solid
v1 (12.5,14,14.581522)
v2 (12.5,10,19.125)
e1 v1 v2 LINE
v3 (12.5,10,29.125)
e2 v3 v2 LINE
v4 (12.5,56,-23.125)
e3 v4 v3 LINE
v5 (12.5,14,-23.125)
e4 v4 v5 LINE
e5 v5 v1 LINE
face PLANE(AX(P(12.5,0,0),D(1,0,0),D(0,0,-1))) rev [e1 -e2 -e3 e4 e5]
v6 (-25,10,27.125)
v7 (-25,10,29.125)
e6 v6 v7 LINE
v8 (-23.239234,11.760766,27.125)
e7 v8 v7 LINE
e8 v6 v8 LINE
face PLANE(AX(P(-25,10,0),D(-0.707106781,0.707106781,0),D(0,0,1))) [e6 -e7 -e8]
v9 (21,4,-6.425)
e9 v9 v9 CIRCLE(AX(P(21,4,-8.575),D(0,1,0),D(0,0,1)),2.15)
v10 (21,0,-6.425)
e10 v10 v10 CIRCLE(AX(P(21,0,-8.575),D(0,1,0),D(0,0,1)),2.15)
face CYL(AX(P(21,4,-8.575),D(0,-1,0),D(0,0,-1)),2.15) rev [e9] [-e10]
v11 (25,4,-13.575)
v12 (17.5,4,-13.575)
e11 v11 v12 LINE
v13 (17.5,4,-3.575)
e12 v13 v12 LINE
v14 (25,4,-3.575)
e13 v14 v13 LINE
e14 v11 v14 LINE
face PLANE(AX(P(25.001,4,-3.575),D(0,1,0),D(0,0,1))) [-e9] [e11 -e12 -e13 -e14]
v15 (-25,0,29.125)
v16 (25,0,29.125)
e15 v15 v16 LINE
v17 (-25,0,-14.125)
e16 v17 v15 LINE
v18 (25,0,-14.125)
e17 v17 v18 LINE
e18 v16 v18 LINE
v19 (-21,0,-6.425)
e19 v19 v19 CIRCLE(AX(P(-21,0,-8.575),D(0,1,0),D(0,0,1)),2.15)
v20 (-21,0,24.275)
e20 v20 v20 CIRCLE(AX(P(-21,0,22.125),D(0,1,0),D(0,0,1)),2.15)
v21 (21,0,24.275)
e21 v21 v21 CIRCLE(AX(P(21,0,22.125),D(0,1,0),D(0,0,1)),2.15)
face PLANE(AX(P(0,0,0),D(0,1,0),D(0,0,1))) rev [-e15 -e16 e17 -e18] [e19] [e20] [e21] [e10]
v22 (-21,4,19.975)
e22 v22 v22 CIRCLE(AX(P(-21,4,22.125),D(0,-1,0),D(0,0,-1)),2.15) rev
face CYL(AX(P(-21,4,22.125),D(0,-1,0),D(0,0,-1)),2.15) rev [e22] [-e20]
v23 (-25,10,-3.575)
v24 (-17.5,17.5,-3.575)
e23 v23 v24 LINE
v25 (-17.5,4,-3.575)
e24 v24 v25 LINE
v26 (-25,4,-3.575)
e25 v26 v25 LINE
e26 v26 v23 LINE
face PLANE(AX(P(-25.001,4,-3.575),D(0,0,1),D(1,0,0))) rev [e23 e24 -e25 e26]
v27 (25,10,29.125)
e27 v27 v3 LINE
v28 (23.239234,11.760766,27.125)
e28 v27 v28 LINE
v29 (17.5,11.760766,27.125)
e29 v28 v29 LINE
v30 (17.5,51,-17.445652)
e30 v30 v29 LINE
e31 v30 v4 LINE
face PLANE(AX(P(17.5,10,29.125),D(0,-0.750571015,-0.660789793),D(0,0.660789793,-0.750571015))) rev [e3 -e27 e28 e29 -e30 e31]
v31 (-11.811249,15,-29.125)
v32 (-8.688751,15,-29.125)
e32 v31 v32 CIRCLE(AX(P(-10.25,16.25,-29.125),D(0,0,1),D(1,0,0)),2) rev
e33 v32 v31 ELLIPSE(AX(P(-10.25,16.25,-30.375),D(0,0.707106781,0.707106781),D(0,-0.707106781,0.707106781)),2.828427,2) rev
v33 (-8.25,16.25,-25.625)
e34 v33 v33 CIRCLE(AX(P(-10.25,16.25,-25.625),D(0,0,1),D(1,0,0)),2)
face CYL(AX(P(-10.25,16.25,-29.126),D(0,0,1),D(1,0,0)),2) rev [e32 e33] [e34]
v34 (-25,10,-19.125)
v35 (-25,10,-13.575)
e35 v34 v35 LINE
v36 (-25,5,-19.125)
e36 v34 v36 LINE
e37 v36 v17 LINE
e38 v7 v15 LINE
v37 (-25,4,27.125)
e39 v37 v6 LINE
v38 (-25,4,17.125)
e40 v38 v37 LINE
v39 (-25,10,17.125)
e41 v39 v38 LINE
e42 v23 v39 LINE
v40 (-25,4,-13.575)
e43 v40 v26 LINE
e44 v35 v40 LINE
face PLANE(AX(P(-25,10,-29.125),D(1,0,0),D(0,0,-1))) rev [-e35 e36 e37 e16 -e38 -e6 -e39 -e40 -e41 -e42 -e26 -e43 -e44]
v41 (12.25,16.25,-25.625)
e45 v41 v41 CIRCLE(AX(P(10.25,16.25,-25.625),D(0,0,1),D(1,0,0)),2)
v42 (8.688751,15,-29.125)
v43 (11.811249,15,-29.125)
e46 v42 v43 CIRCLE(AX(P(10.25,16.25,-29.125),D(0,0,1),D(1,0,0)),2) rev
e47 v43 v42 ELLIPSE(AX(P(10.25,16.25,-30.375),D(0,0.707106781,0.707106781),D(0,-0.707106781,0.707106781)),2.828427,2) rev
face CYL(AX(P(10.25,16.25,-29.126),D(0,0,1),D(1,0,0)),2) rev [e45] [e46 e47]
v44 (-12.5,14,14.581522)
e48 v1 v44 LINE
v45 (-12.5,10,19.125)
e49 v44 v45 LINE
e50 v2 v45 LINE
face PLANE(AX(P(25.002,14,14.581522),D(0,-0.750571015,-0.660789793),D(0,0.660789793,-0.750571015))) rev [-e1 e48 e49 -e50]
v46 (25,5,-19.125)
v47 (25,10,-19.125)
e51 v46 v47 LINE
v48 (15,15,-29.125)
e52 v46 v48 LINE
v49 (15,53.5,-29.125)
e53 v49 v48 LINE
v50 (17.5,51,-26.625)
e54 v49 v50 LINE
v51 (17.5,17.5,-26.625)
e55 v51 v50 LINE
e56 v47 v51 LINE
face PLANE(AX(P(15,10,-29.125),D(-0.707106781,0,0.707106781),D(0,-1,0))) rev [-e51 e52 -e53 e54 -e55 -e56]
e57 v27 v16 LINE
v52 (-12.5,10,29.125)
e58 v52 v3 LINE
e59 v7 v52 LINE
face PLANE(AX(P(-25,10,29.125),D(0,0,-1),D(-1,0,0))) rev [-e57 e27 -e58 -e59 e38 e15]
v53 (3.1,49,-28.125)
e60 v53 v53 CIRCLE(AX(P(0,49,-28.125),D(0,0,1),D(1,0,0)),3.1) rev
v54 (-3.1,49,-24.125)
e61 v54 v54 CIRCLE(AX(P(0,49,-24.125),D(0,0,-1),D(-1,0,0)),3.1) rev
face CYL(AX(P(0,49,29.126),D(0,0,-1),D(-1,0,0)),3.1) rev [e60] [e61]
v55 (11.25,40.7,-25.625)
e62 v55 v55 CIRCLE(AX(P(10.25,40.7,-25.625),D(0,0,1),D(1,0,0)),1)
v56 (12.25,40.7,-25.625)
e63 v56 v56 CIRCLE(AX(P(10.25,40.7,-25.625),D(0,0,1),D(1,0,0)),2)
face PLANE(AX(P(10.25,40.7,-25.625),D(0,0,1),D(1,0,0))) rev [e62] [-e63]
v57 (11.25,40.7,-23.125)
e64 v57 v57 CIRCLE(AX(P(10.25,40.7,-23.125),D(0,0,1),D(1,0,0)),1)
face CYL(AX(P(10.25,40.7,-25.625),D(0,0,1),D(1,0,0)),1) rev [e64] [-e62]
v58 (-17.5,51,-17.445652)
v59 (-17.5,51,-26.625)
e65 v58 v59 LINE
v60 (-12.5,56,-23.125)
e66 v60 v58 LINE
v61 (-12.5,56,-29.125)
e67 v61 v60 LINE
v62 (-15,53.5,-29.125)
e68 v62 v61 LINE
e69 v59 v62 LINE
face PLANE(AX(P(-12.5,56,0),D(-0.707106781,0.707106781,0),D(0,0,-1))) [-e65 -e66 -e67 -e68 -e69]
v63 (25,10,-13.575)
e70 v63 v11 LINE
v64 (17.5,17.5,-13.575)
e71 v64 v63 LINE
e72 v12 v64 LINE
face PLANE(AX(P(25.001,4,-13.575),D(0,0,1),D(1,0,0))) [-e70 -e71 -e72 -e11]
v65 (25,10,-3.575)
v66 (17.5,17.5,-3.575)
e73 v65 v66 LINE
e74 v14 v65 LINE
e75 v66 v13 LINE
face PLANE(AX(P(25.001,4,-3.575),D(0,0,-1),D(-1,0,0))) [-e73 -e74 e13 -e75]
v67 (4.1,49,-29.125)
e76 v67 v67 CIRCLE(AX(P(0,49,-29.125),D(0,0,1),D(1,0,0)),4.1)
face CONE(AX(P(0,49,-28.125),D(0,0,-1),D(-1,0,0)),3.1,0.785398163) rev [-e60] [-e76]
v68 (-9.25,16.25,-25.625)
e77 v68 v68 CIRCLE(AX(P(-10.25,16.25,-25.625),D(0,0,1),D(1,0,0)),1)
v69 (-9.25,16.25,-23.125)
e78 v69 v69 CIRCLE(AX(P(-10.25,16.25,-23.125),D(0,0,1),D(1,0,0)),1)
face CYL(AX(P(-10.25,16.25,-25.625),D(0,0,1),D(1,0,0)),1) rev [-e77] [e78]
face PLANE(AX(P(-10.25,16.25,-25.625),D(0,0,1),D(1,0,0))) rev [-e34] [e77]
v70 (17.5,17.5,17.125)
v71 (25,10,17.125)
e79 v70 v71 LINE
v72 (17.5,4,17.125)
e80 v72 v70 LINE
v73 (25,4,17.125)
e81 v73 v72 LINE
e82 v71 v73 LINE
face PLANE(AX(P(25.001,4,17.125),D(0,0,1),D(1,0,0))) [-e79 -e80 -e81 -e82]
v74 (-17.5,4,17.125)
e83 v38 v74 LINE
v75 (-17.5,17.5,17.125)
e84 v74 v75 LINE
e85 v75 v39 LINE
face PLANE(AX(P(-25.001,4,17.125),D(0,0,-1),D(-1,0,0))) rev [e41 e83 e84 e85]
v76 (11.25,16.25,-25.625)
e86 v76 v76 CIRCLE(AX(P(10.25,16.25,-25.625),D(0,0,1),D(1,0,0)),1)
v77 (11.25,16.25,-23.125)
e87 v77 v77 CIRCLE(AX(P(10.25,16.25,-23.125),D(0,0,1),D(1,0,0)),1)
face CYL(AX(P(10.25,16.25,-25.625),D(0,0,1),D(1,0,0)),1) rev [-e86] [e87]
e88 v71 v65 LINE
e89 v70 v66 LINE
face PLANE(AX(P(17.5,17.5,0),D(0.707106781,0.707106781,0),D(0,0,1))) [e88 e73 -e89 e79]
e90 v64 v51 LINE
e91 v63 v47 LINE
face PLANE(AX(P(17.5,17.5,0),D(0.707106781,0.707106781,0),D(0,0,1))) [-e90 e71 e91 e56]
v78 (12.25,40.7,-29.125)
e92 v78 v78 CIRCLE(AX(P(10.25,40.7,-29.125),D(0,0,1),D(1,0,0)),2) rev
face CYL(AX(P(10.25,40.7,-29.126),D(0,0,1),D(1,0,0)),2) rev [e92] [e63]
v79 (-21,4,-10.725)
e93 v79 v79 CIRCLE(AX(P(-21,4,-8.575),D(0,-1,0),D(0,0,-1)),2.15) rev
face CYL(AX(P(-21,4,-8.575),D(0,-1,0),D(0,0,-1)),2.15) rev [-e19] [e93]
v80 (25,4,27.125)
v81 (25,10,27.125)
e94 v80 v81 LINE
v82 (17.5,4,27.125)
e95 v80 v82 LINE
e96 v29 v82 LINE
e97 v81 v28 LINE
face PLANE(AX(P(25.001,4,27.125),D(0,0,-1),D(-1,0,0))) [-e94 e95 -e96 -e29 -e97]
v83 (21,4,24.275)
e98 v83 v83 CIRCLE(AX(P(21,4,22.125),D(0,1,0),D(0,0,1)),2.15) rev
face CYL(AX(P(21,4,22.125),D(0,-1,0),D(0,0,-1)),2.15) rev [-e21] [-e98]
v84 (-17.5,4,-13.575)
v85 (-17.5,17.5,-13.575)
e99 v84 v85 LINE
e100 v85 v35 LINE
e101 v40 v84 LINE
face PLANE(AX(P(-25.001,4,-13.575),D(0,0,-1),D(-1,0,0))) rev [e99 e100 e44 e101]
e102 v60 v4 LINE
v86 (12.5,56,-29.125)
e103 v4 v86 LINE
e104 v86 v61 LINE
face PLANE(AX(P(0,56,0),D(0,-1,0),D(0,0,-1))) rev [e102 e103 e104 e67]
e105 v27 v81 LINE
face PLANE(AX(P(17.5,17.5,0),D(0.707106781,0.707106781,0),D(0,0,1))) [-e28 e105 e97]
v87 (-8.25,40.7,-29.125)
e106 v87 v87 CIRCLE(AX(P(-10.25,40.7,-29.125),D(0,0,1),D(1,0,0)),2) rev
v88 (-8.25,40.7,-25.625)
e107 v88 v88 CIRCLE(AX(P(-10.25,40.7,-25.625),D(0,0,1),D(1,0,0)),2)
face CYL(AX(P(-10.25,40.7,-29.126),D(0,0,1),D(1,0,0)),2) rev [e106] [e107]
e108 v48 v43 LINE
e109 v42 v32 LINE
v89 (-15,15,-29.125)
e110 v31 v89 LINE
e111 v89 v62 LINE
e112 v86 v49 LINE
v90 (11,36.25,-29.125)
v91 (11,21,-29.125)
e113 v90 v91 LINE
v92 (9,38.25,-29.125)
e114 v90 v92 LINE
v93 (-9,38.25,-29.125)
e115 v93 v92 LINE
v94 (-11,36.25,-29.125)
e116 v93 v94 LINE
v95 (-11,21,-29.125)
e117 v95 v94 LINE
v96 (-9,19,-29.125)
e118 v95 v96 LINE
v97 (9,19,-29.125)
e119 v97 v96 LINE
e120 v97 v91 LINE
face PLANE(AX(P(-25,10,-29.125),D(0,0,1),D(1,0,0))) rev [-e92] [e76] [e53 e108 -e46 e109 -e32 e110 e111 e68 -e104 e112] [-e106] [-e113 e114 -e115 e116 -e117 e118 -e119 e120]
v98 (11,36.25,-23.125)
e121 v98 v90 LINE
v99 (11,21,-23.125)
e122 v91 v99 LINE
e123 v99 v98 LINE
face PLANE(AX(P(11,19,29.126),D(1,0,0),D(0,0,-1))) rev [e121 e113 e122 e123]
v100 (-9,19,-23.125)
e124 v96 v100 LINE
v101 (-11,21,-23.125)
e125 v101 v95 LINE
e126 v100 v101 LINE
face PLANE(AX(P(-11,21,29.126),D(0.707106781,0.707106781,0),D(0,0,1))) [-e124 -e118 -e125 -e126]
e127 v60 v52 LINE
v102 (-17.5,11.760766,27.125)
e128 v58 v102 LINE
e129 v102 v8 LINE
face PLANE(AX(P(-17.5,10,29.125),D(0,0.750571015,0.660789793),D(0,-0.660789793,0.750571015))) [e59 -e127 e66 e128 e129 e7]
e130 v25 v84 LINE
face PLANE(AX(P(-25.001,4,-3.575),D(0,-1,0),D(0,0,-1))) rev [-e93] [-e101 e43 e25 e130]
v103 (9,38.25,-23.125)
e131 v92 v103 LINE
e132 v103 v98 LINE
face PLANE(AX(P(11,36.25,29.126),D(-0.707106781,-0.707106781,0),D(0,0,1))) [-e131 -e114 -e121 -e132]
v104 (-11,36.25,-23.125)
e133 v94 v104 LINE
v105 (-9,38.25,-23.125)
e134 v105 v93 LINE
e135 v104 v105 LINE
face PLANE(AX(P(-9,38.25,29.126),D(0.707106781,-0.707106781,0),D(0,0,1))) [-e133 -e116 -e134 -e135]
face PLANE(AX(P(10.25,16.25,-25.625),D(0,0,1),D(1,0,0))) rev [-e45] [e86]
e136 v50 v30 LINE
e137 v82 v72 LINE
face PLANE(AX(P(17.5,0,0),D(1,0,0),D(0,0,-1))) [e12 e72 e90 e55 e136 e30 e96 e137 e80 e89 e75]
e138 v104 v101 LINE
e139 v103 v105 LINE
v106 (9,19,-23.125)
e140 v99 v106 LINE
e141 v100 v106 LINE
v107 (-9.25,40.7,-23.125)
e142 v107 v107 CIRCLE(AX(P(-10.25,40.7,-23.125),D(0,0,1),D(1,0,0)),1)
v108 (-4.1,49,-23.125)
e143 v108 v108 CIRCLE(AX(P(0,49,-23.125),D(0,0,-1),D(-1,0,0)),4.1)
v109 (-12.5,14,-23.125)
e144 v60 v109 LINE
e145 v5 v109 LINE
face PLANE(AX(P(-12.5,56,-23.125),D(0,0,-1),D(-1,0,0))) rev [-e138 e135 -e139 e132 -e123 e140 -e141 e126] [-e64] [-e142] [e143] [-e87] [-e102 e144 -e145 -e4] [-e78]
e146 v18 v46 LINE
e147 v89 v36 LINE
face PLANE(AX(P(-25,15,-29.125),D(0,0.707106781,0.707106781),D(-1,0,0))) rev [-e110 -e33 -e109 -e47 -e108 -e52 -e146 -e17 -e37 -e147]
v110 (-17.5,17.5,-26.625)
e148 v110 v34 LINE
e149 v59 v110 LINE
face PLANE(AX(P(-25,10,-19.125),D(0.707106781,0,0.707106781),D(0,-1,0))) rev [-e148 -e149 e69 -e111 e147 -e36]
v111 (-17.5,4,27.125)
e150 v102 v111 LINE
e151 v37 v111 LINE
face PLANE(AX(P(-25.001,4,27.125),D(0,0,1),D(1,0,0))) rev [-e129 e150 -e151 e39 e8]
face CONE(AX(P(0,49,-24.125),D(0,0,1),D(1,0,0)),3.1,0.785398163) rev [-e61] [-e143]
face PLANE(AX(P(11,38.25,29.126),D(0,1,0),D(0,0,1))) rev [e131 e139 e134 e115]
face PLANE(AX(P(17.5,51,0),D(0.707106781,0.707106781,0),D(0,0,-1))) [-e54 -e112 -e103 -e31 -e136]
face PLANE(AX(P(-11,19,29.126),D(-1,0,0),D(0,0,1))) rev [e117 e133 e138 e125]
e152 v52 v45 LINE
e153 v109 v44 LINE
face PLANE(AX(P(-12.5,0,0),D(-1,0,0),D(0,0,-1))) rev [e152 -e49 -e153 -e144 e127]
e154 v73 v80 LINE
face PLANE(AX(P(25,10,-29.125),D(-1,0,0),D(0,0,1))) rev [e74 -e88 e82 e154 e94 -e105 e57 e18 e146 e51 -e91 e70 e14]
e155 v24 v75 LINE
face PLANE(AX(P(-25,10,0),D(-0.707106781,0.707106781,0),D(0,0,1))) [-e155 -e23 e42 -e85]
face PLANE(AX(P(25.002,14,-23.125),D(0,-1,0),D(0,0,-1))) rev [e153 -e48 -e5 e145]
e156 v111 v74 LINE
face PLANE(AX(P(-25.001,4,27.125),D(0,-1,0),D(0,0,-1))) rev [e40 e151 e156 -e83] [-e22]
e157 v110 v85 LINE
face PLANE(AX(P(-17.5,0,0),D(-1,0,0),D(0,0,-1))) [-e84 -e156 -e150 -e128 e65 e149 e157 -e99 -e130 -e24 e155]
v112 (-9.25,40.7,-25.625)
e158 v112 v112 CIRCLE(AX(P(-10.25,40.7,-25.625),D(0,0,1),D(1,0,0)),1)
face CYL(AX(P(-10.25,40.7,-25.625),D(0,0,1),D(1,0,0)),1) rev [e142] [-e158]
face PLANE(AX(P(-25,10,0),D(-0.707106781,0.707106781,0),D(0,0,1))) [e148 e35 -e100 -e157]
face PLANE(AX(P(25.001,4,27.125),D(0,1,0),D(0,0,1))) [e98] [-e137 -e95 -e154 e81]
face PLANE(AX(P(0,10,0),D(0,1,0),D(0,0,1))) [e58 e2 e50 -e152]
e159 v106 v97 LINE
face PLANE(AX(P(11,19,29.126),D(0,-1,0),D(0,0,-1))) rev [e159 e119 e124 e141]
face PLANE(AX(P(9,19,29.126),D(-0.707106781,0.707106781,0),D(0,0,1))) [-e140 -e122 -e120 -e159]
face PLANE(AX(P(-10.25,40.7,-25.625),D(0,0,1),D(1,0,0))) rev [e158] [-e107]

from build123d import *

# Parameters (mm, degrees)
SKETCH1_W               = 50
SKETCH1_H               = 58.25
BOSS_EXTRUDE1_DEPTH     = 10
SKETCH2_R               = 2.15
CUT_EXTRUDE1_DEPTH      = 4
SKETCH5_W               = 25
SKETCH5_H               = 6
BOSS_EXTRUDE3_DEPTH     = 46
CUT_EXTRUDE3_REACH      = 86.582
SKETCH6_W               = 22
SKETCH6_H               = 19.25
SKETCH7_R               = 1
CUT_EXTRUDE4_DEPTH      = 2.5
CUT_EXTRUDE5_REACH      = 84.21
SKETCH8_R               = 2
BOSS_EXTRUDE4_DEPTH     = 5
CHAMFER1_SIZE           = 7.5
CHAMFER2_SIZE           = 10
CHAMFER4_SIZE           = 15
CHAMFER5_SIZE           = 5
CHAMFER7_SIZE           = 2
CUT_EXTRUDE6_REACH      = 86.582
SKETCH10_R              = 3.1
CHAMFER8_SIZE           = 1
BOSS_EXTRUDE5_REACH     = 75.42
CUT_EXTRUDE12_REACH     = 78.095
SKETCH17_W              = 10
SKETCH17_H              = 13.5
LPATTERN1_COUNT         = 2
LPATTERN1_PITCH         = 30.7
MIRROR3_COPY_1_REACH    = 78.095
MIRROR3_COPY_1_SKETCH_W = 10
MIRROR3_COPY_1_SKETCH_H = 13.5


# Some blends are built 0.0001 mm under size
with BuildPart() as part:
    # Sketch1 → Boss-Extrude1 (new body)
    with BuildSketch(Plane(origin=(0, 0, 0), x_dir=(1, 0, 0), z_dir=(0, 1, 0))):
        Rectangle(SKETCH1_W, SKETCH1_H)
    extrude(amount=BOSS_EXTRUDE1_DEPTH)

    # Sketch2 → Cut-Extrude1 (cut)
    with BuildSketch(Plane(origin=(0, 0, 0), x_dir=(1, 0, 0), z_dir=(0, 1, 0))):
        with Locations(Location((-21, 8.575, 0), (0, 0, 270))):
            Circle(SKETCH2_R)
        with Locations(Location((-21, -22.125, 0), (0, 0, 270))):
            Circle(SKETCH2_R)
        with Locations(Location((21, 8.575, 0), (0, 0, 270))):
            Circle(SKETCH2_R)
        with Locations(Location((21, -22.125, 0), (0, 0, 270))):
            Circle(SKETCH2_R)
    extrude(amount=CUT_EXTRUDE1_DEPTH, mode=Mode.SUBTRACT)

    # Sketch5 → Boss-Extrude3 (add)
    with BuildSketch(Plane(origin=(0, 10, 0), x_dir=(1, 0, 0), z_dir=(0, 1, 0))):
        with Locations((0, 26.125)):
            Rectangle(SKETCH5_W, SKETCH5_H)
    extrude(amount=BOSS_EXTRUDE3_DEPTH)

    # Sketch6 → Cut-Extrude3 (cut, up to next)
    with BuildSketch(Plane(origin=(0, 0, -29.125), x_dir=(-1, 0, 0), z_dir=(0, 0, -1)), mode=Mode.PRIVATE) as cut_extrude3_sk1:
        with Locations((0, 28.625)):
            Rectangle(SKETCH6_W, SKETCH6_H)
    cut_extrude3_tool1 = extrude(cut_extrude3_sk1.sketch, amount=-CUT_EXTRUDE3_REACH, mode=Mode.PRIVATE) & part.part
    add(cut_extrude3_tool1.solids().sort_by_distance((0, 28.625, -29.125))[0], mode=Mode.SUBTRACT)

    # Sketch7 → Cut-Extrude4 (cut)
    with BuildSketch(Plane.XY.offset(-23.125)):
        with Locations((10.25, 16.25)):
            Circle(SKETCH7_R)
        with Locations((-10.25, 16.25)):
            Circle(SKETCH7_R)
        with Locations((-10.25, 40.7)):
            Circle(SKETCH7_R)
        with Locations((10.25, 40.7)):
            Circle(SKETCH7_R)
    extrude(amount=-CUT_EXTRUDE4_DEPTH, mode=Mode.SUBTRACT)

    # Sketch8 → Cut-Extrude5 (cut, up to next)
    with BuildSketch(Plane.XY.offset(-25.625), mode=Mode.PRIVATE) as cut_extrude5_sk1:
        with Locations((-10.25, 40.7)):
            Circle(SKETCH8_R)
    cut_extrude5_tool1 = extrude(cut_extrude5_sk1.sketch, amount=-CUT_EXTRUDE5_REACH, mode=Mode.PRIVATE) & part.part
    # Sketch8 → Cut-Extrude5 (cut, up to next)
    with BuildSketch(Plane.XY.offset(-25.625), mode=Mode.PRIVATE) as cut_extrude5_sk2:
        with Locations((10.25, 40.7)):
            Circle(SKETCH8_R)
    cut_extrude5_tool2 = extrude(cut_extrude5_sk2.sketch, amount=-CUT_EXTRUDE5_REACH, mode=Mode.PRIVATE) & part.part
    # Sketch8 → Cut-Extrude5 (cut, up to next)
    with BuildSketch(Plane.XY.offset(-25.625), mode=Mode.PRIVATE) as cut_extrude5_sk3:
        with Locations((10.25, 16.25)):
            Circle(SKETCH8_R)
    cut_extrude5_tool3 = extrude(cut_extrude5_sk3.sketch, amount=-CUT_EXTRUDE5_REACH, mode=Mode.PRIVATE) & part.part
    # Sketch8 → Cut-Extrude5 (cut, up to next)
    with BuildSketch(Plane.XY.offset(-25.625), mode=Mode.PRIVATE) as cut_extrude5_sk4:
        with Locations((-10.25, 16.25)):
            Circle(SKETCH8_R)
    cut_extrude5_tool4 = extrude(cut_extrude5_sk4.sketch, amount=-CUT_EXTRUDE5_REACH, mode=Mode.PRIVATE) & part.part
    add(cut_extrude5_tool1.solids().sort_by_distance((-10.25, 40.7, -25.625))[0], mode=Mode.SUBTRACT)
    add(cut_extrude5_tool2.solids().sort_by_distance((10.25, 40.7, -25.625))[0], mode=Mode.SUBTRACT)
    add(cut_extrude5_tool3.solids().sort_by_distance((10.25, 16.25, -25.625))[0], mode=Mode.SUBTRACT)
    add(cut_extrude5_tool4.solids().sort_by_distance((-10.25, 16.25, -25.625))[0], mode=Mode.SUBTRACT)

    # Sketch9 → Boss-Extrude4 (add)
    with BuildSketch(Plane(origin=(12.5, 0, 0), x_dir=(0, 0, -1), z_dir=(1, 0, 0))):
        Polygon((29.125, 56), (23.125, 56), (-29.125, 10), (29.125, 10), align=None)
    boss_extrude4 = extrude(amount=BOSS_EXTRUDE4_DEPTH)

    # Mirror1: Boss-Extrude4 across plane
    add(boss_extrude4.mirror(Plane(origin=(0, 0, 0), x_dir=(0, 0, 1), z_dir=(1, 0, 0))))

    # Chamfer1
    chamfer1_edges = [part.edges().sort_by_distance(p)[0] for p in [
        (17.5, 10, 0),
        (-17.5, 10, 0),
    ]]
    chamfer(chamfer1_edges, length=CHAMFER1_SIZE - 0.0001)  # a hair under: the kernel refuses the full size

    # Chamfer2
    chamfer2_edges = [part.edges().sort_by_distance(p)[0] for p in [
        (-25, 5, -29.125),
        (25, 5, -29.125),
    ]]
    chamfer(chamfer2_edges, length=CHAMFER2_SIZE)

    # Chamfer4
    # the kernel refuses this chamfer: 15 mm, written as the material it takes off along each edge
    with BuildSketch(Plane(origin=(-53.575244819, 0, -29.125), x_dir=(0, 0.9996219169112968, -0.02749587661058632), z_dir=(1, 0, 0))) as chamfer4_piece_1:
        Polygon((CHAMFER4_SIZE * 0.999621916911, CHAMFER4_SIZE * 0.0274958766106), (-CHAMFER4_SIZE * 0.0274958766106, CHAMFER4_SIZE * 0.999621916911), (0, 0), align=None)
    extrude(amount=107.150489639, mode=Mode.SUBTRACT)

    # Chamfer5
    chamfer5_edges = [part.edges().sort_by_distance(p)[0] for p in [
        (17.5, 56, -24.875),
        (-17.5, 56, -24.875),
    ]]
    chamfer(chamfer5_edges, length=CHAMFER5_SIZE)

    # Chamfer7
    chamfer7_edges = [part.edges().sort_by_distance(p)[0] for p in [
        (-11, 38.25, -26.125),
        (-11, 19, -26.125),
        (11, 19, -26.125),
        (11, 38.25, -26.125),
    ]]
    chamfer(chamfer7_edges, length=CHAMFER7_SIZE)

    # Sketch10 → Cut-Extrude6 (cut, up to next)
    with BuildSketch(Plane(origin=(0, 0, -29.125), x_dir=(-1, 0, 0), z_dir=(0, 0, -1)), mode=Mode.PRIVATE) as cut_extrude6_sk1:
        with Locations((0, 49)):
            Circle(SKETCH10_R)
    cut_extrude6_tool1 = extrude(cut_extrude6_sk1.sketch, amount=-CUT_EXTRUDE6_REACH, mode=Mode.PRIVATE) & part.part
    add(cut_extrude6_tool1.solids().sort_by_distance((0, 49, -29.125))[0], mode=Mode.SUBTRACT)

    # Chamfer8
    chamfer8_edges = [part.edges().sort_by_distance(p)[0] for p in [
        (3.1, 49, -29.125),
        (3.1, 49, -23.125),
    ]]
    chamfer(chamfer8_edges, length=CHAMFER8_SIZE)

    # Sketch11 → Boss-Extrude5 (add, up to next)
    with BuildSketch(Plane(origin=(-12.5, 0, 0), x_dir=(0, 0, -1), z_dir=(1, 0, 0)), mode=Mode.PRIVATE) as boss_extrude5_sk1:
        Polygon((-19.125, 10), (23.125, 10), (23.125, 14), (-14.581521739, 14), align=None)
    boss_extrude5_tool1 = extrude(boss_extrude5_sk1.sketch, amount=BOSS_EXTRUDE5_REACH, mode=Mode.PRIVATE) - part.part
    add(boss_extrude5_tool1.solids().sort_by_distance((-12.5, 11.962117, -3.114355))[0])

    # Sketch17 → Cut-Extrude12 (cut, up to next)
    with BuildSketch(Plane(origin=(17.5, 0, 0), x_dir=(0, 0, -1), z_dir=(1, 0, 0)), mode=Mode.PRIVATE) as cut_extrude12_sk1:
        with Locations((8.575, 10.75)):
            Rectangle(SKETCH17_W, SKETCH17_H)
    cut_extrude12_tool1 = extrude(cut_extrude12_sk1.sketch, amount=CUT_EXTRUDE12_REACH, mode=Mode.PRIVATE) & part.part
    cut_extrude12 = cut_extrude12_tool1.solids().sort_by_distance((17.5, 10.75, -8.575))[0]
    add(cut_extrude12, mode=Mode.SUBTRACT)

    # LPattern1: Cut-Extrude12 ×2
    with Locations(*[(0, 0, i * LPATTERN1_PITCH) for i in range(1, LPATTERN1_COUNT)]):
        add(cut_extrude12, mode=Mode.SUBTRACT)

    # Mirror3: Cut-Extrude12 across plane
    add(cut_extrude12.mirror(Plane(origin=(0, 0, 0), x_dir=(0, 0, 1), z_dir=(1, 0, 0))), mode=Mode.SUBTRACT)

    # Mirror3 copy 1 sketch → Mirror3 copy 1 (cut, up to next)
    with BuildSketch(Plane(origin=(-17.5, 0, 30.7), x_dir=(0, 0, -1), z_dir=(-1, 0, 0)), mode=Mode.PRIVATE) as mirror3_copy_1_sk1:
        with Locations((8.575, -10.75)):
            Rectangle(MIRROR3_COPY_1_SKETCH_W, MIRROR3_COPY_1_SKETCH_H)
    mirror3_copy_1_tool1 = extrude(mirror3_copy_1_sk1.sketch, amount=MIRROR3_COPY_1_REACH, mode=Mode.PRIVATE) & part.part
    add(mirror3_copy_1_tool1.solids().sort_by_distance((-17.5, 10.75, 22.125))[0], mode=Mode.SUBTRACT)


solid = part.part
